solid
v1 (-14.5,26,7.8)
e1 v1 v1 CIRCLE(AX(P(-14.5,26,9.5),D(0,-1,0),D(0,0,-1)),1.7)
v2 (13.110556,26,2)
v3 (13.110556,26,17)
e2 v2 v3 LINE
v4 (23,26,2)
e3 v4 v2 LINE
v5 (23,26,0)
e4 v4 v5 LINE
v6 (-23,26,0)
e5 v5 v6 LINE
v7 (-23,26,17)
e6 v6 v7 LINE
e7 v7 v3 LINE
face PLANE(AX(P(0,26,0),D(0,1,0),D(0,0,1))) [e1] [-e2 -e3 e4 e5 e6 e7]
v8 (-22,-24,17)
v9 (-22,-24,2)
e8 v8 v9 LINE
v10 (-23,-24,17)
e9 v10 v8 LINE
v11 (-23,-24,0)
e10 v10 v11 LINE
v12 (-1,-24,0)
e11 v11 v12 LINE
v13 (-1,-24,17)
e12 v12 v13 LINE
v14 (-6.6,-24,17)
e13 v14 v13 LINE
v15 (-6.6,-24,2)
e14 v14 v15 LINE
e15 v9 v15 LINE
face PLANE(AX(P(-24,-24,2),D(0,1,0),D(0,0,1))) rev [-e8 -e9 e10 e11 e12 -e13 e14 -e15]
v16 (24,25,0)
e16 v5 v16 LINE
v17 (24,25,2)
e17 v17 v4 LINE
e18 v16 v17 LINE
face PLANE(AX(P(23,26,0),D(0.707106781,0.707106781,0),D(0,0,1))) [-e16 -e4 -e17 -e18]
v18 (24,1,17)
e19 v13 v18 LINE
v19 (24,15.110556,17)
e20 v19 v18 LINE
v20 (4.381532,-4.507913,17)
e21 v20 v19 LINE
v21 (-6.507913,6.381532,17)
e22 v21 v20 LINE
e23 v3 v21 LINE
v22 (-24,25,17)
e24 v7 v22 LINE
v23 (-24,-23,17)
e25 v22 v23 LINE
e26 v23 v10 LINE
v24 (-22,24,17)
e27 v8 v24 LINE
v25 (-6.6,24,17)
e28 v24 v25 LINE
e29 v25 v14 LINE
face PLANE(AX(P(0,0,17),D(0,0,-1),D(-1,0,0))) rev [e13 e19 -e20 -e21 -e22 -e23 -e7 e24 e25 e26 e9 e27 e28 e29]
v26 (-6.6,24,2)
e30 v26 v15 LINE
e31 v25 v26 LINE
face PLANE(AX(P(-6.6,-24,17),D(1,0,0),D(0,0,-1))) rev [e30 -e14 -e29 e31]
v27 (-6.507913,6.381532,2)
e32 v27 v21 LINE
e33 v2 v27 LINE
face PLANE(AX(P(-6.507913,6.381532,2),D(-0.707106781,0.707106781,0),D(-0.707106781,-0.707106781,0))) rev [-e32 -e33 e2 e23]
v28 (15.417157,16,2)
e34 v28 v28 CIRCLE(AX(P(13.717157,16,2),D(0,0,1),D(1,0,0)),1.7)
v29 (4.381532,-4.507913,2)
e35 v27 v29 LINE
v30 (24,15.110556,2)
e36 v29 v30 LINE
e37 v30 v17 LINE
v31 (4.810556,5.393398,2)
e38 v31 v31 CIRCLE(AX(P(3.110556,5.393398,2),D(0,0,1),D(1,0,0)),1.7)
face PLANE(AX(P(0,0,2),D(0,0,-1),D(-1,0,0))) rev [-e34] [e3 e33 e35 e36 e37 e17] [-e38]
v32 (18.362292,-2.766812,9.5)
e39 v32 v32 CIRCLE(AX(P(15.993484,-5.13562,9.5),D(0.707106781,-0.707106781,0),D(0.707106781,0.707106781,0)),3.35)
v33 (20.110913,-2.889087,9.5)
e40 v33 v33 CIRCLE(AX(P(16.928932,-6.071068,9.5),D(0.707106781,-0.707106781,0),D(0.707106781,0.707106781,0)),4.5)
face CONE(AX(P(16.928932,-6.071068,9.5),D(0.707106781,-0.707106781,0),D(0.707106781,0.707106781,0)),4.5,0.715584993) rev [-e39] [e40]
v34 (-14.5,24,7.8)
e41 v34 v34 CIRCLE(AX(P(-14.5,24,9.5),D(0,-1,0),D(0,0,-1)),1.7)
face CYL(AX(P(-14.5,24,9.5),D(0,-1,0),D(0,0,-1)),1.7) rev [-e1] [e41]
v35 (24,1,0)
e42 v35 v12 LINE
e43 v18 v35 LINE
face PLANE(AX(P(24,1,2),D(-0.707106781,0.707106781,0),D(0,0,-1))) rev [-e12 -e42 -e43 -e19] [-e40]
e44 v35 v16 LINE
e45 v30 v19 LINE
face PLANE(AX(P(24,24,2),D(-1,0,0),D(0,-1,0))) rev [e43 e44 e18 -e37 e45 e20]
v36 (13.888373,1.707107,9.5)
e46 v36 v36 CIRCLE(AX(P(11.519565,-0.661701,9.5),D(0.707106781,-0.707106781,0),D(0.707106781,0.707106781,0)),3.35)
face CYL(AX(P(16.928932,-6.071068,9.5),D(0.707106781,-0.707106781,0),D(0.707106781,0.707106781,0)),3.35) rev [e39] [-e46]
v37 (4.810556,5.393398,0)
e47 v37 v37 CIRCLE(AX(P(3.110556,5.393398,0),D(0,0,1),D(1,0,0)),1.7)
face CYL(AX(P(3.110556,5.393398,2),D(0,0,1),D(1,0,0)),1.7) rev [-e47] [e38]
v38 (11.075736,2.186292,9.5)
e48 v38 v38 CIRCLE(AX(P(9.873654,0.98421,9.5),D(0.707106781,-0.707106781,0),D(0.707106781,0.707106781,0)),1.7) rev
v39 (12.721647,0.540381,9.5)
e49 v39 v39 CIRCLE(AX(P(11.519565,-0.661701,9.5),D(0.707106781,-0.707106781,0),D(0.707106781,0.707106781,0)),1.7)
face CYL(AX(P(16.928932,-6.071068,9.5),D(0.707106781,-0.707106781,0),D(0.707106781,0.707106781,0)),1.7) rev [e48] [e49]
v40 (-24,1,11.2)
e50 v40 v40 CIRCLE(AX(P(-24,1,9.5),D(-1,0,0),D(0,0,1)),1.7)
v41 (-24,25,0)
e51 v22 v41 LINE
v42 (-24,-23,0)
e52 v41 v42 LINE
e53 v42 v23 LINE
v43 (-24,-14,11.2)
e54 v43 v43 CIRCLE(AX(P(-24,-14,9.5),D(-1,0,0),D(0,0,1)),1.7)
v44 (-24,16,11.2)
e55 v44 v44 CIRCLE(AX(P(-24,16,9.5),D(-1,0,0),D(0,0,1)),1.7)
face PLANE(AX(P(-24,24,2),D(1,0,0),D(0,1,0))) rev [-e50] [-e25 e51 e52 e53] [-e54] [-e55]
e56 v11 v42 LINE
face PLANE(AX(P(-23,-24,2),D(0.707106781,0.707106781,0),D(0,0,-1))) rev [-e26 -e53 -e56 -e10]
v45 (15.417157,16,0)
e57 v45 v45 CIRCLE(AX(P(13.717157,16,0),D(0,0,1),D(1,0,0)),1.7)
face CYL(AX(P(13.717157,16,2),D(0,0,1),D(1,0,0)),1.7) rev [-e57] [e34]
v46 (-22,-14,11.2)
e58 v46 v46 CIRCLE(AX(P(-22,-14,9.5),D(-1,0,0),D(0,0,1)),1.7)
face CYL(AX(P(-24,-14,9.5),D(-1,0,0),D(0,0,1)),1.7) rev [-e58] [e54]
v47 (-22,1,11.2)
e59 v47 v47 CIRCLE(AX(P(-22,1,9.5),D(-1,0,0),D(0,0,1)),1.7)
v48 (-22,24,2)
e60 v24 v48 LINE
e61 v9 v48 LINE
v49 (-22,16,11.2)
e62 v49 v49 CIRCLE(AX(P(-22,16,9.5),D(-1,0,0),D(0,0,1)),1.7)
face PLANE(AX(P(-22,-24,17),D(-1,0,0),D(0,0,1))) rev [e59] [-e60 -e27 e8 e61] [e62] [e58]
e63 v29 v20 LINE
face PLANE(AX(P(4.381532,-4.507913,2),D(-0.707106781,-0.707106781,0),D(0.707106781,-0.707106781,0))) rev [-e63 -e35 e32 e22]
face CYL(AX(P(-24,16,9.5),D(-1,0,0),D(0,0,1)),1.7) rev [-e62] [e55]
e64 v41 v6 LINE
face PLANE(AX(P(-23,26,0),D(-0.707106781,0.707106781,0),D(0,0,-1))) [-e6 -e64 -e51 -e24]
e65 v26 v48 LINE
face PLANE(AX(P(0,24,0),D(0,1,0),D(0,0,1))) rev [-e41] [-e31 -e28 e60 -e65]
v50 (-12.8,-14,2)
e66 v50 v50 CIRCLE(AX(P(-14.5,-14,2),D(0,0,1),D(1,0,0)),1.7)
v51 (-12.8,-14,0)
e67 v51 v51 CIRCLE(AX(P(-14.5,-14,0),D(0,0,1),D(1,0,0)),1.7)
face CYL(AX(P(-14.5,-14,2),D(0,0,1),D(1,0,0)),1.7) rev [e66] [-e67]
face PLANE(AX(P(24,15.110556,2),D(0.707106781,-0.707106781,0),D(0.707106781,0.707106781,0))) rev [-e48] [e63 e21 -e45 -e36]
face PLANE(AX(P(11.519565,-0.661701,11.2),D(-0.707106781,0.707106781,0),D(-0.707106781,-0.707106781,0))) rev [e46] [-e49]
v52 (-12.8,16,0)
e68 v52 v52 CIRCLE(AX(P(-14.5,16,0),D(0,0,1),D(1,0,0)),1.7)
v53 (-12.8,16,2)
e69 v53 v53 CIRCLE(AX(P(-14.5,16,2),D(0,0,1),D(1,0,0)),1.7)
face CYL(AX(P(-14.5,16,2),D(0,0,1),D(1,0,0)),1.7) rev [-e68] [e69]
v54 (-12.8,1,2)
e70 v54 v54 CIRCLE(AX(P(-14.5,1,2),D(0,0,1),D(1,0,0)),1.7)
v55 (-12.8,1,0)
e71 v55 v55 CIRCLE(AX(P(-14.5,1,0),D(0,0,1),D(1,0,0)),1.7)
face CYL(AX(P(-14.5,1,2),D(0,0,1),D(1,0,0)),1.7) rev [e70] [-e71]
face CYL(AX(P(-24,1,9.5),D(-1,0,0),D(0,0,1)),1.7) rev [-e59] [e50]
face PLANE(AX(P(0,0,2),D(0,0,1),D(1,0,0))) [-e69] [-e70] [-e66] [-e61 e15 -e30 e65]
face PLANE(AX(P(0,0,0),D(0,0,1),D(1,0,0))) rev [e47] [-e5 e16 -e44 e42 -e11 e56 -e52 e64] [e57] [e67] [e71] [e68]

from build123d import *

# Parameters (mm, degrees)
SKETCH1_W                = 48
SKETCH1_H                = 48
BOSS_EXTRUDE1_DEPTH      = 2
SKETCH2_W                = 2
SKETCH2_H                = 48
BOSS_EXTRUDE2_DEPTH      = 15
SKETCH3_W                = 48
SKETCH3_H                = 17
BOSS_EXTRUDE3_DEPTH      = 2
SKETCH6_W                = 28.6
SKETCH6_H                = 48
BOSS_EXTRUDE4_DEPTH      = 15
CUT_EXTRUDE2_DEPTH       = 15
M3_CLEARANCE_HOLE1_D     = 3.4
CHAMFER1_SIZE            = 1
CHAMFER2_SIZE            = 1
CHAMFER3_SIZE            = 1
M3_CLEARANCE_HOLE2_D     = 3.4
CHAMFER7_SIZE            = 25
M3_CLEARANCE_HOLE3_D     = 3.4
M3_CLEARANCE_HOLE3_DEPTH = 2


# Read off the part's stored shape, not the designer's step: CBORE for M3 SBHCS1
with BuildPart() as part:
    # Sketch1 → Boss-Extrude1 (new body)
    with BuildSketch(Plane.XY):
        Rectangle(SKETCH1_W, SKETCH1_H)
    extrude(amount=BOSS_EXTRUDE1_DEPTH)

    # Sketch2 → Boss-Extrude2 (add)
    with BuildSketch(Plane.XY.offset(2)):
        with Locations((-23, 0)):
            Rectangle(SKETCH2_W, SKETCH2_H)
        with Locations((-5.6, 0)):
            Rectangle(SKETCH2_W, SKETCH2_H)
    extrude(amount=BOSS_EXTRUDE2_DEPTH)

    # Sketch3 → Boss-Extrude3 (add)
    with BuildSketch(Plane(origin=(0, 24, 0), x_dir=(1, 0, 0), z_dir=(0, 1, 0))):
        with Locations((0, -8.5)):
            Rectangle(SKETCH3_W, SKETCH3_H)
    extrude(amount=BOSS_EXTRUDE3_DEPTH)

    # Sketch6 → Boss-Extrude4 (add)
    with BuildSketch(Plane.XY.offset(2)):
        with Locations((9.7, 0)):
            Rectangle(SKETCH6_W, SKETCH6_H)
    extrude(amount=BOSS_EXTRUDE4_DEPTH)

    # Sketch7 → Cut-Extrude2 (cut)
    with BuildSketch(Plane.XY.offset(17)):
        Polygon((24, 15.11055557), (4.381531726, -4.507912705), (-6.507912705, 6.381531726), (13.11055557, 26), (24, 26), align=None)
    extrude(amount=-CUT_EXTRUDE2_DEPTH, mode=Mode.SUBTRACT)

    # M3 Clearance Hole1 (through all)
    with Locations(Plane.XY.offset(2)):
        with Locations((-14.5, 16), (-14.5, 1), (-14.5, -14), (3.11055557, 5.393398282), (13.717157288, 16)):
            Hole(M3_CLEARANCE_HOLE1_D / 2)

    # Chamfer1
    chamfer1_edges = [part.edges().sort_by_distance(p)[0] for p in [
        (24, 26, 1),
    ]]
    chamfer(chamfer1_edges, length=CHAMFER1_SIZE)

    # Chamfer2
    chamfer2_edges = [part.edges().sort_by_distance(p)[0] for p in [
        (-24, 26, 8.5),
    ]]
    chamfer(chamfer2_edges, length=CHAMFER2_SIZE)

    # Chamfer3
    chamfer3_edges = [part.edges().sort_by_distance(p)[0] for p in [
        (-24, -24, 8.5),
    ]]
    chamfer(chamfer3_edges, length=CHAMFER3_SIZE)

    # M3 Clearance Hole2 (through all)
    with Locations(Plane(origin=(0, 24, 0), x_dir=(-1, 0, 0), z_dir=(0, -1, 0))):
        with Locations((14.5, -9.5)):
            Hole(M3_CLEARANCE_HOLE2_D / 2)

    # Chamfer7
    chamfer7_edges = [part.edges().sort_by_distance(p)[0] for p in [
        (24, -24, 8.5),
    ]]
    chamfer(chamfer7_edges, length=CHAMFER7_SIZE)

    # CBORE for M3 SBHCS1 outline → CBORE for M3 SBHCS1 (revolve, cut)
    with BuildSketch(Plane(origin=(5.428932188, 5.428932188, 9.5), x_dir=(0.707106781186549, 0.707106781186546, 0), z_dir=(0, 0, -1))):
        Polygon((0, 6.285786438), (1.7, 6.285786438), (1.7, 8.613455967), (3.35, 8.613455967), (3.35, 14.940532299), (4.5, 16.263455967), (0, 16.263455967), align=None)
    revolve(axis=Axis((5.428932188, 5.428932188, 9.5), (0.707106781186546, -0.707106781186549, 0)), mode=Mode.SUBTRACT)

    # M3 Clearance Hole3
    with Locations(Plane.ZY.offset(24)):
        with Locations((9.5, -14), (9.5, 1), (9.5, 16)):
            Hole(M3_CLEARANCE_HOLE3_D / 2, depth=M3_CLEARANCE_HOLE3_DEPTH)


solid = part.part
